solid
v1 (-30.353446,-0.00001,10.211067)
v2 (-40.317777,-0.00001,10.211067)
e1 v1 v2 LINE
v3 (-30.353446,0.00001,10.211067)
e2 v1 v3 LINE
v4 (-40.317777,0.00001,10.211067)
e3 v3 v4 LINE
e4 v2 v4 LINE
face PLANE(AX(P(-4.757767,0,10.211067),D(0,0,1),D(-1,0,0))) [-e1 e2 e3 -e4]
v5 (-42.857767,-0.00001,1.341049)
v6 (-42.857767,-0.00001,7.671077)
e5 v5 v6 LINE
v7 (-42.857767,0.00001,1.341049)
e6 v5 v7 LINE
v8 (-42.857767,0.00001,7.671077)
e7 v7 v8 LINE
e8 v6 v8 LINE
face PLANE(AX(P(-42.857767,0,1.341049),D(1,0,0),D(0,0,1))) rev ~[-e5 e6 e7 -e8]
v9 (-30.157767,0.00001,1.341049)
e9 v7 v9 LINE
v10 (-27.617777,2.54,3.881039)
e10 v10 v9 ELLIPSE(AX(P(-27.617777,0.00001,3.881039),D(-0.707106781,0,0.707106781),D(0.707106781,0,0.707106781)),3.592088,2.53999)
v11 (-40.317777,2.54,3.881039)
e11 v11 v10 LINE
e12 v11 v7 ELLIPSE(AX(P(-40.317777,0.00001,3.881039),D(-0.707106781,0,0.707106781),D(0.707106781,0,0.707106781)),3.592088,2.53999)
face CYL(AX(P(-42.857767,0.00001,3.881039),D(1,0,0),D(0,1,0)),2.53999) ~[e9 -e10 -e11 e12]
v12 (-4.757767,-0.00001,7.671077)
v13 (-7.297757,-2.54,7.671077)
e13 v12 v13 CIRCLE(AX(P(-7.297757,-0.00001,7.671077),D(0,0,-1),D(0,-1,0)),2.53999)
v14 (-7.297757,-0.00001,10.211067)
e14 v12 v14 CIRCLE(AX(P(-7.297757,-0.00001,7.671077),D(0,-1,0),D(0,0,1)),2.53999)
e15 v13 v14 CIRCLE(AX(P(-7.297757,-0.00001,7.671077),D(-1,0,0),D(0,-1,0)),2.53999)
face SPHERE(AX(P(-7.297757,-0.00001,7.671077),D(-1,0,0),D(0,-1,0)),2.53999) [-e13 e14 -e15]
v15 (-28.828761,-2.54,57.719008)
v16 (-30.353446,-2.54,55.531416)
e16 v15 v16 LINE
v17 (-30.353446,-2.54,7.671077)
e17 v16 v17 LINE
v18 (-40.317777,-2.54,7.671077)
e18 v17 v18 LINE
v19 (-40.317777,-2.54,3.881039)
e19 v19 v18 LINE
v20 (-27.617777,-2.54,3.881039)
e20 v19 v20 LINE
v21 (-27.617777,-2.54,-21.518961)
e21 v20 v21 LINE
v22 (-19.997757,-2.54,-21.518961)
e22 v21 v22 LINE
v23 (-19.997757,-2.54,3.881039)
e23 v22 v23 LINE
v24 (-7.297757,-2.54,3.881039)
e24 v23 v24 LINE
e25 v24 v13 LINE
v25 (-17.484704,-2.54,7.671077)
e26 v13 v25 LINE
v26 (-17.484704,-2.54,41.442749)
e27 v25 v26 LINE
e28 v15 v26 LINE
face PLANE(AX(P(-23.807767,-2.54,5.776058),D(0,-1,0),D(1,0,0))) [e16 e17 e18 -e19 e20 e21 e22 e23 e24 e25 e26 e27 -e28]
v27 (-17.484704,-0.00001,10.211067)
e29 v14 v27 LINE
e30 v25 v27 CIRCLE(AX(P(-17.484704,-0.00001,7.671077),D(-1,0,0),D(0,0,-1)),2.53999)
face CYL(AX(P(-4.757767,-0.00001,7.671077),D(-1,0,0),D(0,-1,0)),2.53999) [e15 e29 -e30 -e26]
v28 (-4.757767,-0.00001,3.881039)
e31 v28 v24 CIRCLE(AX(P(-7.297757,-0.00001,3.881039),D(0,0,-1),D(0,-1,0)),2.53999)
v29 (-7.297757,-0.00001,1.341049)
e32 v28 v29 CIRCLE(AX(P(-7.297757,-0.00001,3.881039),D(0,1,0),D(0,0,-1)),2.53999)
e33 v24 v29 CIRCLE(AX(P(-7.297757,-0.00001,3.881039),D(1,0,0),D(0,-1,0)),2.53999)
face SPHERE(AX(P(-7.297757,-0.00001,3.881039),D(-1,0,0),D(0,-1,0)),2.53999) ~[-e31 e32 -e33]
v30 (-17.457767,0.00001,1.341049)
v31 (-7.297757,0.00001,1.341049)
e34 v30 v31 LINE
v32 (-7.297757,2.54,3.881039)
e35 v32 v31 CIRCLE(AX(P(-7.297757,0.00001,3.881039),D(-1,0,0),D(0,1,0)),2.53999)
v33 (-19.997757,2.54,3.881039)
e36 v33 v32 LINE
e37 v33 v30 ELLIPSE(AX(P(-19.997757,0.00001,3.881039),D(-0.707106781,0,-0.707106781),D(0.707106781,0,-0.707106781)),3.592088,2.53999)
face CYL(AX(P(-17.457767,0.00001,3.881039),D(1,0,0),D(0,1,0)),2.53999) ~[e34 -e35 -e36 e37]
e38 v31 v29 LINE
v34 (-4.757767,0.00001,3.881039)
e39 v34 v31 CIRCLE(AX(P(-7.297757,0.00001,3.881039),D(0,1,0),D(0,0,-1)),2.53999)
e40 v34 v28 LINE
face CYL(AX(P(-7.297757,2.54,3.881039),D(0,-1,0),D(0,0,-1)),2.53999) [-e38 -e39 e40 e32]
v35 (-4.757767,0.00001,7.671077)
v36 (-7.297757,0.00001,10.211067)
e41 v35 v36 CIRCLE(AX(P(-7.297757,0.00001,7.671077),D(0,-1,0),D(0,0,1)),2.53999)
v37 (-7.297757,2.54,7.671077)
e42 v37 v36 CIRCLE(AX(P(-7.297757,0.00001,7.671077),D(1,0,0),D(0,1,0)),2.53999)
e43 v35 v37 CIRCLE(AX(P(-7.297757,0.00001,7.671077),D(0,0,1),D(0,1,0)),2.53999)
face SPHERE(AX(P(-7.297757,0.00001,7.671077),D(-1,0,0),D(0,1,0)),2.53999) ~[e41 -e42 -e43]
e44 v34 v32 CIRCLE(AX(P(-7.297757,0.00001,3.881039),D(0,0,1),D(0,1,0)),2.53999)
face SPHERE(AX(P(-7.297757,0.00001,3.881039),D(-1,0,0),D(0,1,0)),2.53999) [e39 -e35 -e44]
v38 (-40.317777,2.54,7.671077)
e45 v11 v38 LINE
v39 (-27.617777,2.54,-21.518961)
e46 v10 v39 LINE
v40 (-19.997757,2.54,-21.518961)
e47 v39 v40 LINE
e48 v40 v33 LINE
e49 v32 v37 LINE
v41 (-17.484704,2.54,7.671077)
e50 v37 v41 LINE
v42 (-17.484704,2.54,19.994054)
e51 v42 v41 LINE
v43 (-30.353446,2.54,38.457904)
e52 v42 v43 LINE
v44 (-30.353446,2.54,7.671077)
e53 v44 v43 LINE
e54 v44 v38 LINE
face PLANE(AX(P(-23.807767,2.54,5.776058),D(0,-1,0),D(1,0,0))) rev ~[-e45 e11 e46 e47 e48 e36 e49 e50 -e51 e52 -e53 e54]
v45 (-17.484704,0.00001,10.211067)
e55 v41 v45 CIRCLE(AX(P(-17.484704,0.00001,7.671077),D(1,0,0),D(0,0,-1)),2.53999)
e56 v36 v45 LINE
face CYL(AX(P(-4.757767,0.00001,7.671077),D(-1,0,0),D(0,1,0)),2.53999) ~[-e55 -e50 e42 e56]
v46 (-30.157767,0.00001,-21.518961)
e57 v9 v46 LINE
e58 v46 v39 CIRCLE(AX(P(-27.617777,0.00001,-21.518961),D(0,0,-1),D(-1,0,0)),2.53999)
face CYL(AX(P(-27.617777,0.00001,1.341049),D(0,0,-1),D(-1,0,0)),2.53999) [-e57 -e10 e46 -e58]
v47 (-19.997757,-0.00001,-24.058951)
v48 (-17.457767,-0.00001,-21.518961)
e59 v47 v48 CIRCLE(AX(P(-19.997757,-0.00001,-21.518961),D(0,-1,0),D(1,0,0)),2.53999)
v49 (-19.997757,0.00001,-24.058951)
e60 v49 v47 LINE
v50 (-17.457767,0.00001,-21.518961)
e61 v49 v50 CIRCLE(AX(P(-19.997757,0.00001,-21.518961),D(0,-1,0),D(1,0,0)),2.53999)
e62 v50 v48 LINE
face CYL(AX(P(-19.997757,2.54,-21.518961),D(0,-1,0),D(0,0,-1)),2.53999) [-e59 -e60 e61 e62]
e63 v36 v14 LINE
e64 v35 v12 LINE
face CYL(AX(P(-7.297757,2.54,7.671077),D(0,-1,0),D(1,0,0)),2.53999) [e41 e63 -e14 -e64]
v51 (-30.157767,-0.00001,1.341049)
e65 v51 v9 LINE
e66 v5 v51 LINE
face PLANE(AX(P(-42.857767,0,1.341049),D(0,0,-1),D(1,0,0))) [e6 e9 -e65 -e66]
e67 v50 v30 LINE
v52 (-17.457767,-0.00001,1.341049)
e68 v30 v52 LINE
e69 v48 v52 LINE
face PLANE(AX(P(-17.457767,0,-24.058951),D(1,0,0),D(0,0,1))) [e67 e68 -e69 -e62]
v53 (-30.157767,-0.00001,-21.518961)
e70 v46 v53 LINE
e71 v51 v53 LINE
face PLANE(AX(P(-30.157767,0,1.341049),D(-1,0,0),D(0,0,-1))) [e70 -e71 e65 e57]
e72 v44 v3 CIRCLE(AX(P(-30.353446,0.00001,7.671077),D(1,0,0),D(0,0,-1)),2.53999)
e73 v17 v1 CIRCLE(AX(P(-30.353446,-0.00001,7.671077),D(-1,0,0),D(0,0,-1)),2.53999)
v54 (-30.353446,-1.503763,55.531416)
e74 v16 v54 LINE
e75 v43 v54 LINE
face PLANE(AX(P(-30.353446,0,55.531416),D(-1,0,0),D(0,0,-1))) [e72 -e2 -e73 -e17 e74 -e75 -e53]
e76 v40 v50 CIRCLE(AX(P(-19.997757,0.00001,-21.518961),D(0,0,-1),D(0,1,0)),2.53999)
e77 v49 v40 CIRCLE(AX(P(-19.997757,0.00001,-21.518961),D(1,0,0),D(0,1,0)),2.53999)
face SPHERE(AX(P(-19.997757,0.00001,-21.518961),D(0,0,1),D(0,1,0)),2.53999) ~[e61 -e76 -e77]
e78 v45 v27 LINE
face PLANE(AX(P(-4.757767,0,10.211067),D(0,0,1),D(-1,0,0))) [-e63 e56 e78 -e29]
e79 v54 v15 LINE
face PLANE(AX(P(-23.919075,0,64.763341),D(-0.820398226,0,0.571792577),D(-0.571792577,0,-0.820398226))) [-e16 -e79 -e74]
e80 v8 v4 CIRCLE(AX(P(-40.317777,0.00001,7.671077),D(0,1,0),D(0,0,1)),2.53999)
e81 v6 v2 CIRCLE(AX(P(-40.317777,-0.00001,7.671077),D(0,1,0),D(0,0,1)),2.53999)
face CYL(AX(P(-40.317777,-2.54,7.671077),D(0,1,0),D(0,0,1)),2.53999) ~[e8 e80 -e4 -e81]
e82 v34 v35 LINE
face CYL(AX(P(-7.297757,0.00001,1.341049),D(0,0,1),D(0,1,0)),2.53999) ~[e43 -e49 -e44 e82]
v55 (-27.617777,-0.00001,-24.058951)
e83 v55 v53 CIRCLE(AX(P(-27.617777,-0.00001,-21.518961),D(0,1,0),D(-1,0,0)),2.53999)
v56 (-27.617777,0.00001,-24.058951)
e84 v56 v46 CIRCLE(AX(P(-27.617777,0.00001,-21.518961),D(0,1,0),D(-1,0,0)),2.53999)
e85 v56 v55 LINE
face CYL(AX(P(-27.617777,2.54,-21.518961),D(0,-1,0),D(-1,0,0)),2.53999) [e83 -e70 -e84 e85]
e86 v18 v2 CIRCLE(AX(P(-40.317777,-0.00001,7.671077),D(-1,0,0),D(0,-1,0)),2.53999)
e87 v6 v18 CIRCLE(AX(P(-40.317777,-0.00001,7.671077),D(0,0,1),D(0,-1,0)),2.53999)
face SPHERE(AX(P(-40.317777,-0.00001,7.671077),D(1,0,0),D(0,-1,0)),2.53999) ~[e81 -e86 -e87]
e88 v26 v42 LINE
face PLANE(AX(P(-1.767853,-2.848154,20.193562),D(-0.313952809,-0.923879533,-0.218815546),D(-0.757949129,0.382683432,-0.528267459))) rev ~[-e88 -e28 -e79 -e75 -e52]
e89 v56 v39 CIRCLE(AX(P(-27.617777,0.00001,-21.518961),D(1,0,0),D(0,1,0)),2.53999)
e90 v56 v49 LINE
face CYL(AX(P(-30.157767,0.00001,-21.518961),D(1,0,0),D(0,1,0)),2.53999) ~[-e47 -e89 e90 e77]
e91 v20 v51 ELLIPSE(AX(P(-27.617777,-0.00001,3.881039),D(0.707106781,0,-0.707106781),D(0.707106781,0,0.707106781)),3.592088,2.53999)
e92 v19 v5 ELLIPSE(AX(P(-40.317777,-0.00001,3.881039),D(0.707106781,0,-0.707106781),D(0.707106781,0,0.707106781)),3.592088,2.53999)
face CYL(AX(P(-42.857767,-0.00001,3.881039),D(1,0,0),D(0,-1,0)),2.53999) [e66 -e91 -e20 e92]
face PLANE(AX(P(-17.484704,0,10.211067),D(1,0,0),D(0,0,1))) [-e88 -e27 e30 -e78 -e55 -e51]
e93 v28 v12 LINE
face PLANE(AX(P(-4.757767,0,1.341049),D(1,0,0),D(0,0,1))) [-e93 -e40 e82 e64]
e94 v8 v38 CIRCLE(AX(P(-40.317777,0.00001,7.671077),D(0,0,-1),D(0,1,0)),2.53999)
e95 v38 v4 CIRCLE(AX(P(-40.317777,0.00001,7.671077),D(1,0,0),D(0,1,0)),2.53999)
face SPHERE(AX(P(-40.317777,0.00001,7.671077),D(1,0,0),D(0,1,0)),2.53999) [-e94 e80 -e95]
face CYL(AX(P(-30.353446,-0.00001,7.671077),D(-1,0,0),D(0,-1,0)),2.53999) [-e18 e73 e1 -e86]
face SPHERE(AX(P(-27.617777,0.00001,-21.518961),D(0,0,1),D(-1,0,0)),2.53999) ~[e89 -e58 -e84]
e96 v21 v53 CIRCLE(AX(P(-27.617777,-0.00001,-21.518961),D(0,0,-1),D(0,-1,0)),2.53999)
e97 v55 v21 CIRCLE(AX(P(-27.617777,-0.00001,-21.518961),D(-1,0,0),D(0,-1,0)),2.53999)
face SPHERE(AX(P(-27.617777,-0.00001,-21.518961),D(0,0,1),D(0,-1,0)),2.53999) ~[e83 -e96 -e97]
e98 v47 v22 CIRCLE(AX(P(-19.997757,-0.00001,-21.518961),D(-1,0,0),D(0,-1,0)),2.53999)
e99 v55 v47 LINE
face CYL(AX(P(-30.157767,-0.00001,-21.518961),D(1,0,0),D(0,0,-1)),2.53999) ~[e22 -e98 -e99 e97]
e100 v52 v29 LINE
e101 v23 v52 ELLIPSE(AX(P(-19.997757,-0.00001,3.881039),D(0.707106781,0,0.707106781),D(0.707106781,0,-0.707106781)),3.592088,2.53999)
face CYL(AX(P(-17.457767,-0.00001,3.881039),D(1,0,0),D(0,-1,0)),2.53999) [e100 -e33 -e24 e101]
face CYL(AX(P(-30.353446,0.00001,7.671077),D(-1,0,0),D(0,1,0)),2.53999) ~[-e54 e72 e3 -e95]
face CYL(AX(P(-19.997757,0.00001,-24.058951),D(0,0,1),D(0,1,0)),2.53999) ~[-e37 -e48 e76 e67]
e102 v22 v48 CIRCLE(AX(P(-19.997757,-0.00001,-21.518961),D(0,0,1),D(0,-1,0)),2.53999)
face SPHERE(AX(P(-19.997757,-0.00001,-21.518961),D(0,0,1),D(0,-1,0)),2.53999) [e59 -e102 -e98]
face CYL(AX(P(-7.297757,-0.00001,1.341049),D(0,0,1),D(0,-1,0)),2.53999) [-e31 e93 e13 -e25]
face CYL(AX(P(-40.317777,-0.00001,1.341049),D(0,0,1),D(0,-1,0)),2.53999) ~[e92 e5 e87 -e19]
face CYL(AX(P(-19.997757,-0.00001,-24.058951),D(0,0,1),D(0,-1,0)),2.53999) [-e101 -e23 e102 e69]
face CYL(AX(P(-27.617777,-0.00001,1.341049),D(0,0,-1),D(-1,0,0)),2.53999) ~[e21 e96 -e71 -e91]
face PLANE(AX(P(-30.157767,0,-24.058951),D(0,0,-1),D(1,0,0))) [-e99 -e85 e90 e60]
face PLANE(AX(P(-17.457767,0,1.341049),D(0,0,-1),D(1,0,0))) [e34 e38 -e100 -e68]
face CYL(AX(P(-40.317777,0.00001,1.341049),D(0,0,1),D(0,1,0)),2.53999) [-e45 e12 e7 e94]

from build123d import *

# Parameters (mm, degrees)
F0_W        = 12.7
F0_H        = 8.8700183392
F0_H_2      = 25.4
F2_DEPTH    = 2.54
F3_DEPTH    = 2.54
F4_R        = 2.53999
F5_T1_DEPTH = 76.5737284666
F6_T1_DEPTH = 62.0182579324


# Not quite as in the source:
# - a fillet or chamfer that OpenCascade refuses, or shapes differently, is made with other operations: its cross-section is extruded or revolved along the edge and cut away or added
# - a fillet or chamfer is up to 0.001 mm smaller than in the source, because OpenCascade refuses the exact size


with BuildPart() as f2:
    # F0 (on Front) → F2 (new body, symmetric)
    with BuildSketch(Plane.XZ):
        with Locations((-23.8077666163, 5.7760581046)):
            Rectangle(F0_W, F0_H)
        with Locations((-23.8077666163, -11.3589510649)):
            Rectangle(F0_W, F0_H_2)
        with Locations((-36.5077666163, 5.7760581046)):
            Rectangle(F0_W, F0_H)
        with Locations((-11.1077666163, 5.7760581046)):
            Rectangle(F0_W, F0_H)
    extrude(amount=F2_DEPTH, both=True)

    # F1 (on Front) → F3 (join, symmetric)
    with BuildSketch(Plane.XZ):
        Polygon((-30.3534455597, 10.2110672742), (-17.4847040325, 10.2110672742), (-17.4847040325, 55.5314160883), (-23.9190747961, 64.7633413825), (-30.3534455597, 55.5314160883), align=None)
    extrude(amount=F3_DEPTH, both=True)

    # F4 (radius 2.54 in the source; OpenCascade refuses exactly that, so slightly less here)
    f4_edges = [f2.edges().sort_by_distance(p)[0] for p in [
        (-11.107767, 2.54, 1.341049),
        (-11.107767, -2.54, 1.341049),
        (-11.121235, 2.54, 10.211067),
        (-11.121235, -2.54, 10.211067),
        (-4.757767, -2.54, 5.776058),
        (-4.757767, 2.54, 5.776058),
        (-4.757767, 0, 10.211067),
        (-4.757767, 0, 1.341049),
        (-36.605606, -2.54, 10.211067),
        (-36.605606, 2.54, 10.211067),
        (-36.507767, -2.54, 1.341049),
        (-36.507767, 2.54, 1.341049),
        (-42.857767, -2.54, 5.776058),
        (-42.857767, 2.54, 5.776058),
        (-42.857767, 0, 10.211067),
        (-17.457767, 2.54, -11.358951),
        (-17.457767, -2.54, -11.358951),
        (-30.157767, -2.54, -11.358951),
        (-30.157767, 2.54, -11.358951),
        (-23.807767, -2.54, -24.058951),
        (-30.157767, 0, -24.058951),
        (-23.807767, 2.54, -24.058951),
        (-17.457767, 0, -24.058951),
    ]]
    fillet(f4_edges, radius=F4_R)

    # F5: chamfer of 12.7 on 1 edges, made by hand

    # F5_s2 → F5_t1 (cut)
    with BuildSketch(Plane(origin=(-13.0912626788, 0, 18.7831201367), x_dir=(0, 1, 0), z_dir=(-0.5717925773, 0, 0.8203982256))):
        Polygon((2.54, -4.7080313623), (-10.16, -17.4080313623), (2.54, -17.4080313623), align=None)
    extrude(amount=F5_T1_DEPTH, mode=Mode.SUBTRACT)

    # F6: chamfer of 7.62 on 1 edges, made by hand

    # F6_s2 → F6_t1 (cut)
    with BuildSketch(Plane(origin=(-10.0507456007, 0, 14.4206381549), x_dir=(0, 1, 0), z_dir=(-0.5717925773, 0, 0.8203982256))):
        Polygon((-2.8481536726, -10.0961850349), (2.54, 2.9119686377), (2.54, -4.7080313623), align=None)
    extrude(amount=F6_T1_DEPTH, mode=Mode.SUBTRACT)


solid = f2.part
